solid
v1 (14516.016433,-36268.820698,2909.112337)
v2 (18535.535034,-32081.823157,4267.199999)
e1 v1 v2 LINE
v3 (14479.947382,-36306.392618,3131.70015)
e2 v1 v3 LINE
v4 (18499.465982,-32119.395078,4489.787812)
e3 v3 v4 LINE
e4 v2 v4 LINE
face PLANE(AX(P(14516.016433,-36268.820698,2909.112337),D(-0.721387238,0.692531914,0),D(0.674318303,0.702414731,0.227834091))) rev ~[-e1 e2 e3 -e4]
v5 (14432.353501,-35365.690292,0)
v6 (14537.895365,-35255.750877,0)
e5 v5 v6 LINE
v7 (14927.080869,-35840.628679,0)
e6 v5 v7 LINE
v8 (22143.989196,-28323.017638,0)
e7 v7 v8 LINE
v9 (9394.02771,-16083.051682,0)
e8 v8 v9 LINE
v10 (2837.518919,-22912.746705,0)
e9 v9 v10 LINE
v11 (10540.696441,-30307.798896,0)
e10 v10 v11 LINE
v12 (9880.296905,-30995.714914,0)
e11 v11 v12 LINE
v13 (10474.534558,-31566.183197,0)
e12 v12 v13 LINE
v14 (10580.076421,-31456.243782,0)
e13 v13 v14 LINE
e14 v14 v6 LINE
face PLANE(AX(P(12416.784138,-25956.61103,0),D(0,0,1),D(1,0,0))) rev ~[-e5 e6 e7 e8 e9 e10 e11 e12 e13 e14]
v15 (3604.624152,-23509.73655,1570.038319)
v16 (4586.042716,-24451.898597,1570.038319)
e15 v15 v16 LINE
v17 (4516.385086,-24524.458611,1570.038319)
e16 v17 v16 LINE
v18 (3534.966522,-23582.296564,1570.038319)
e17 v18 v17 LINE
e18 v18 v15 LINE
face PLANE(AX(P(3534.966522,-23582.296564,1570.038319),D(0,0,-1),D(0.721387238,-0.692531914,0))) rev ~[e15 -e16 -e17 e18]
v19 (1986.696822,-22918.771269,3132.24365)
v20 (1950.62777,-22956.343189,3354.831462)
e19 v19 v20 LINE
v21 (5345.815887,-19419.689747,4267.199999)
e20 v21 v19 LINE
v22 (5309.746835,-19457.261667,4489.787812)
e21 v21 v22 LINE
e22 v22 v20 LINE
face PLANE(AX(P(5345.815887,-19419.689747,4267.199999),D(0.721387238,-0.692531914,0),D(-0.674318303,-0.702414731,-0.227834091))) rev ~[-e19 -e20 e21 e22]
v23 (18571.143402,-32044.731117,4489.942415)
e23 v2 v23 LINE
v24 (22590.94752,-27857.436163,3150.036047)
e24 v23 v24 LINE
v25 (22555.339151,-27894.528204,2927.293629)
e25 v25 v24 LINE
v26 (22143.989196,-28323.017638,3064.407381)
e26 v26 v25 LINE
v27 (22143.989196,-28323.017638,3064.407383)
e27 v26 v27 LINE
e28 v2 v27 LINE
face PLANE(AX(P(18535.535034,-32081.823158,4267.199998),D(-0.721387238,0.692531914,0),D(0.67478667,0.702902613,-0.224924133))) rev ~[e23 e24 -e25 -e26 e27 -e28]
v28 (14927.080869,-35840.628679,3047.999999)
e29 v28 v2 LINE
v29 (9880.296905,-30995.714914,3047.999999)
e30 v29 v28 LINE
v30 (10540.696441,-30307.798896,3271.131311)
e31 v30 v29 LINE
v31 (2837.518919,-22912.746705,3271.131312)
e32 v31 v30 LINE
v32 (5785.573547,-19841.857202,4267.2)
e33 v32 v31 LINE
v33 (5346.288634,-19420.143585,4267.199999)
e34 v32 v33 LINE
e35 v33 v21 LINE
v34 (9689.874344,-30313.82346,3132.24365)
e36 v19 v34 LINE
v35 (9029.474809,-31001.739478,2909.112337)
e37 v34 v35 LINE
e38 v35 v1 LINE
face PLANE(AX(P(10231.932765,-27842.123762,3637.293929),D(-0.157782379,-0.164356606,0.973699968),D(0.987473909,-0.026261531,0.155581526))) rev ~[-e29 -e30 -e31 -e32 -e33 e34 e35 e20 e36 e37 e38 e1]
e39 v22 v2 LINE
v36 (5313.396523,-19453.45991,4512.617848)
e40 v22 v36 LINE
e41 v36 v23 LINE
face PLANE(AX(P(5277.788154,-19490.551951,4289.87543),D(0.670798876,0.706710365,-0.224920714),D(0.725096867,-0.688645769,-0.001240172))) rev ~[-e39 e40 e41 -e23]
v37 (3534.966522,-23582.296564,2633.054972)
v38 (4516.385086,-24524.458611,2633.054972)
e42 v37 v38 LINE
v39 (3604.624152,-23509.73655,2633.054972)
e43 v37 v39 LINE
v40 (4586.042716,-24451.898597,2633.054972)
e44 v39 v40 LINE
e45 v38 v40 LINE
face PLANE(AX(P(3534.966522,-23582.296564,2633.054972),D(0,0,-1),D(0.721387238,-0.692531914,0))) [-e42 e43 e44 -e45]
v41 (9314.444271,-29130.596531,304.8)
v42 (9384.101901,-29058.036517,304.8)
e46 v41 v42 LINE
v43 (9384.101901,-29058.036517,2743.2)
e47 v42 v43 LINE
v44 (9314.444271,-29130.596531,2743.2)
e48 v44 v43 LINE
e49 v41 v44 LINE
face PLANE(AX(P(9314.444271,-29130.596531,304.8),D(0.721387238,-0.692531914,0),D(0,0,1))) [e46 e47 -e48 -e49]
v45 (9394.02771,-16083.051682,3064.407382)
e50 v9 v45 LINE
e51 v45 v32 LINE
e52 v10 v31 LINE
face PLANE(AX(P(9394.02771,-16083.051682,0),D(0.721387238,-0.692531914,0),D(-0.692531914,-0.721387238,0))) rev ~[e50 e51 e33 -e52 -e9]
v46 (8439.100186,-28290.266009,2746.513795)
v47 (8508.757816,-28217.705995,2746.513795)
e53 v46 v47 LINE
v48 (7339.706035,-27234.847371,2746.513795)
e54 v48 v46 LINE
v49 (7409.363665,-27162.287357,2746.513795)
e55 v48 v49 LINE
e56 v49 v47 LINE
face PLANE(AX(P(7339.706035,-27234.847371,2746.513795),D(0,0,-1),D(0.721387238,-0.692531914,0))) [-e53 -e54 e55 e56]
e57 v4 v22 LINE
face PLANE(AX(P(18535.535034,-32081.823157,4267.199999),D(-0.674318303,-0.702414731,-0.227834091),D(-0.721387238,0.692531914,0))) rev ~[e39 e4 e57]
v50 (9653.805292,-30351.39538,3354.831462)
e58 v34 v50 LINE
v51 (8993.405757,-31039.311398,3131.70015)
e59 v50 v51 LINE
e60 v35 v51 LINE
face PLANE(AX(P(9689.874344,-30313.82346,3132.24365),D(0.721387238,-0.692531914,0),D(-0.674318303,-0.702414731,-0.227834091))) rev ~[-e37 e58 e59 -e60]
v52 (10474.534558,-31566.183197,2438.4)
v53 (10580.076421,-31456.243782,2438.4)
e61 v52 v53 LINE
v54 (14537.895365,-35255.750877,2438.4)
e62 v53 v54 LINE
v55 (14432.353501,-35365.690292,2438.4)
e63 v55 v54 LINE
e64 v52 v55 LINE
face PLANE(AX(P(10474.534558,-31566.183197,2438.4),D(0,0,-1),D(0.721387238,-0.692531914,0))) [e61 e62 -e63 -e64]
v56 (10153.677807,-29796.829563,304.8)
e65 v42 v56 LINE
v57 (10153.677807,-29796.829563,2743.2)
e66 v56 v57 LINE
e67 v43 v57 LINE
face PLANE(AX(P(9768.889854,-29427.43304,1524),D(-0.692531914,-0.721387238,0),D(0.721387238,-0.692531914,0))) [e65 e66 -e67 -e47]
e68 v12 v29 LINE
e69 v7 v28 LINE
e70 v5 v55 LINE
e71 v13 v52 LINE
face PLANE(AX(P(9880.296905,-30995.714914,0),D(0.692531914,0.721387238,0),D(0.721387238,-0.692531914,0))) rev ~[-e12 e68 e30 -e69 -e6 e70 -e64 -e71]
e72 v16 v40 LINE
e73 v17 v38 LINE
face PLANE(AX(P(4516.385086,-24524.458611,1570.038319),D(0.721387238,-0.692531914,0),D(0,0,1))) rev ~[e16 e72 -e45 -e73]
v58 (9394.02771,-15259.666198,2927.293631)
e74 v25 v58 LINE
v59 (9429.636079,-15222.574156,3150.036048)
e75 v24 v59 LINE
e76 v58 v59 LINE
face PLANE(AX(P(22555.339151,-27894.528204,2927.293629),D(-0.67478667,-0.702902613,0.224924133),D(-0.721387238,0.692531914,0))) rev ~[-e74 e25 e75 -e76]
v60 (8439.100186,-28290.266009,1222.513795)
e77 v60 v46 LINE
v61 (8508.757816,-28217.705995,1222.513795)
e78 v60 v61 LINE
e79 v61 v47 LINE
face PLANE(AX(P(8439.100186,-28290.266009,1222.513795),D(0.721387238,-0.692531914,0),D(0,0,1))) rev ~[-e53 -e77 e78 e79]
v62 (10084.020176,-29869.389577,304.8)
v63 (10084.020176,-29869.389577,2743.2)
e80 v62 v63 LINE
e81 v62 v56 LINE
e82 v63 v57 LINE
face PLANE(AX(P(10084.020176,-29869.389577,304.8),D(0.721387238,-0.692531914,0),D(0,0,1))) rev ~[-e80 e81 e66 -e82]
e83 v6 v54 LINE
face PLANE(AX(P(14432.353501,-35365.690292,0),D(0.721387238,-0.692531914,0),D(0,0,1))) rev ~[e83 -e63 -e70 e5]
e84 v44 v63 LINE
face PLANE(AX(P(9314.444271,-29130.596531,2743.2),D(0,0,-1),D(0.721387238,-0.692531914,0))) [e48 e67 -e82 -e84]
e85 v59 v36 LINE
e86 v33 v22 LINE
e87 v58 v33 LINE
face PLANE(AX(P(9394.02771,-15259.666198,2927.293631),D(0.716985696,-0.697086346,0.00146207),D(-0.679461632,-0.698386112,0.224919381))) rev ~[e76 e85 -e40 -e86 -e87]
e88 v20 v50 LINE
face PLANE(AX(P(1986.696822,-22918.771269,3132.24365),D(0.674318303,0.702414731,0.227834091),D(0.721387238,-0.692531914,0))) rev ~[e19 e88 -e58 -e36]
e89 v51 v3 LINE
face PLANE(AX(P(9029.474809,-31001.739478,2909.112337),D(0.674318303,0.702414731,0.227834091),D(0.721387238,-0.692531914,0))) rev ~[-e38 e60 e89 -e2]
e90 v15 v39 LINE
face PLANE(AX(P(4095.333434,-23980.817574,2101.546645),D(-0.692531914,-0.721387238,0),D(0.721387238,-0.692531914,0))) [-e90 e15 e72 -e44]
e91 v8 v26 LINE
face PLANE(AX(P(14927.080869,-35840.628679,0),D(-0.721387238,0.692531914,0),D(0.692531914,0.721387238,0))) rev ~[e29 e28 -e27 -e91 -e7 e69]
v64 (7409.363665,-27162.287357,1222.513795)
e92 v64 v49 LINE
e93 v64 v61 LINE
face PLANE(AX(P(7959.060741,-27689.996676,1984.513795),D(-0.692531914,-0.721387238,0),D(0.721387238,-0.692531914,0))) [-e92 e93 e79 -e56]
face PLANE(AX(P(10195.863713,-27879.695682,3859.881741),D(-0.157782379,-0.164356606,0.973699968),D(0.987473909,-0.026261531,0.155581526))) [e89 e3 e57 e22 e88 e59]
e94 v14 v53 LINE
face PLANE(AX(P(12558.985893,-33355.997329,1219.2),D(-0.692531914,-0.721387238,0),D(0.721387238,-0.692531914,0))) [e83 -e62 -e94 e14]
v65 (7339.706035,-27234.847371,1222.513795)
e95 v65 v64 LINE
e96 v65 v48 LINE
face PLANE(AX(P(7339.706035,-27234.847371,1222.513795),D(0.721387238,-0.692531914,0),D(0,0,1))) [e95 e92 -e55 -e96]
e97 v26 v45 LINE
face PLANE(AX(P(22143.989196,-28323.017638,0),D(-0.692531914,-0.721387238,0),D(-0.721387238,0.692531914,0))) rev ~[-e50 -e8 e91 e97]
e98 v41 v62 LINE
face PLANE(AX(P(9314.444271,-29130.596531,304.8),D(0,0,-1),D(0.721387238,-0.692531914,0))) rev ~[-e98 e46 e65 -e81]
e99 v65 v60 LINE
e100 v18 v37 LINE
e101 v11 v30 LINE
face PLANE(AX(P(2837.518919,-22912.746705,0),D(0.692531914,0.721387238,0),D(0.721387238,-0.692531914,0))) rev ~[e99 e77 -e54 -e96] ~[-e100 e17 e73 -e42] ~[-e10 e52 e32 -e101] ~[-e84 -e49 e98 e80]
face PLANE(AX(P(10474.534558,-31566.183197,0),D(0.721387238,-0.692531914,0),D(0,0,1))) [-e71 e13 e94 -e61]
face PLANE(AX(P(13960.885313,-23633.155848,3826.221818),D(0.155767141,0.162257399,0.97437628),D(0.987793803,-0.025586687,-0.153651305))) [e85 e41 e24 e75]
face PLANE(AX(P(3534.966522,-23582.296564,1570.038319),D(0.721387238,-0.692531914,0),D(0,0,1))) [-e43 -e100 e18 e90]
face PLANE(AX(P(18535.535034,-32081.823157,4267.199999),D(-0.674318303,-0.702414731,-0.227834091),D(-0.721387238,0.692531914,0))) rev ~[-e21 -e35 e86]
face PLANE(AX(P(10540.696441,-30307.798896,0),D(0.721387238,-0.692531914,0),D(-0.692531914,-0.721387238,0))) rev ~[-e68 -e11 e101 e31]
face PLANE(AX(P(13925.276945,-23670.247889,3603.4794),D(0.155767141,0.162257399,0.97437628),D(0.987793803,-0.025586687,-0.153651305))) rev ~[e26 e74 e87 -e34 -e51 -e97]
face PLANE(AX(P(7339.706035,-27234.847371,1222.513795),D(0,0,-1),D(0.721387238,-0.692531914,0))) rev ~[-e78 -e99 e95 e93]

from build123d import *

# Parameters (mm, degrees)
F1_DEPTH  = 4267.2
F3_DEPTH  = 22404.0093298425
F4_W      = 5486.4
F4_H      = 2438.4
F5_DEPTH  = 152.4
F6_W      = 1066.8
F6_H      = 2438.4
F6_W_2    = 1524
F6_H_2    = 1524
F6_W_3    = 1360.4601135254
F6_H_3    = 1063.0166530609
F7_DEPTH  = 100.584
F9_DEPTH  = 228.6
F11_DEPTH = 228.6


with BuildPart() as f1:
    # F0 (on Top) → F1 (new body)
    with BuildSketch(Plane.XY):
        Polygon((22143.9891962815, -28323.0176376037), (9394.0277099609, -16083.0516815186), (2837.5189186279, -22912.7467047027), (10540.6964407008, -30307.7988956456), (9880.2969050223, -30995.7149140147), (14927.08086927, -35840.628679157), align=None)
    extrude(amount=F1_DEPTH)

    # F2 (on face) → F3 (cut, through all)
    with BuildSketch(Plane(origin=(25673.4394830699, -24646.5078020462, 0), x_dir=(0.6925319144, 0.7213872382, 0), z_dir=(0.7213872382, -0.6925319144, 0))):
        Polygon((-5096.4442406311, 4267.2), (-10306.968244332, 4267.2), (-5025.367095683, 3048), align=None)
        Polygon((-10306.968244332, 4267.2), (-15517.4922480328, 4267.2), (-15517.4922480328, 3048), align=None)
    extrude(amount=-F3_DEPTH, mode=Mode.SUBTRACT)

    # F4 (on face) → F5 (cut)
    with BuildSketch(Plane(origin=(-10746.3586137999, -11194.1208771108, 0), x_dir=(0.7213872382, -0.6925319144, 0), z_dir=(-0.6925319144, -0.7213872382, 0))):
        with Locations((32159.9848369854, 1219.2)):
            Rectangle(F4_W, F4_H)
    extrude(amount=-F5_DEPTH, mode=Mode.SUBTRACT)

    # F6 (on face) → F7 (cut)
    with BuildSketch(Plane(origin=(-10085.9590781215, -10506.2048587416, 0), x_dir=(0.7213872382, -0.6925319144, 0), z_dir=(-0.6925319144, -0.7213872382, 0))):
        with Locations((27426.589012146, 1524)):
            Rectangle(F6_W, F6_H)
        with Locations((24917.7712554932, 1984.513794899)):
            Rectangle(F6_W_2, F6_H_2)
        with Locations((19561.8027801514, 2101.5466451645)):
            Rectangle(F6_W_3, F6_H_3)
    extrude(amount=-F7_DEPTH, mode=Mode.SUBTRACT)

    # F8 (on face) → F9 (join)
    with BuildSketch(Plane(origin=(-1026.0984542937, -1068.8523007626, 6332.2155253973), x_dir=(0.9874739089, -0.0262615306, 0.155581526), z_dir=(-0.1577823793, -0.1643566058, 0.9736999676))):
        Polygon((10851.9047445382, -29369.6509092254), (10183.1280510822, -30085.1097214559), (15739.266370424, -35278.7221979155), (19809.7725017939, -30924.0855749234), (6452.7419740348, -18438.5720023167), (3051.0125361209, -22077.7498130783), align=None)
    extrude(amount=F9_DEPTH)

    # F10 (on face) → F11 (join)
    with BuildSketch(Plane(origin=(286.5449578876, 298.4842597009, 1792.4358695192), x_dir=(0.9877938033, -0.0255866872, -0.1536513049), z_dir=(0.1557671406, 0.1622573992, 0.9743762796))):
        Polygon((5052.9201327622, -19930.4707746463), (18474.4933741329, -32346.9859386226), (22543.9703278489, -27996.4721098459), (9220.0241803924, -15533.2335330653), align=None)
    extrude(amount=F11_DEPTH)


solid = f1.part
